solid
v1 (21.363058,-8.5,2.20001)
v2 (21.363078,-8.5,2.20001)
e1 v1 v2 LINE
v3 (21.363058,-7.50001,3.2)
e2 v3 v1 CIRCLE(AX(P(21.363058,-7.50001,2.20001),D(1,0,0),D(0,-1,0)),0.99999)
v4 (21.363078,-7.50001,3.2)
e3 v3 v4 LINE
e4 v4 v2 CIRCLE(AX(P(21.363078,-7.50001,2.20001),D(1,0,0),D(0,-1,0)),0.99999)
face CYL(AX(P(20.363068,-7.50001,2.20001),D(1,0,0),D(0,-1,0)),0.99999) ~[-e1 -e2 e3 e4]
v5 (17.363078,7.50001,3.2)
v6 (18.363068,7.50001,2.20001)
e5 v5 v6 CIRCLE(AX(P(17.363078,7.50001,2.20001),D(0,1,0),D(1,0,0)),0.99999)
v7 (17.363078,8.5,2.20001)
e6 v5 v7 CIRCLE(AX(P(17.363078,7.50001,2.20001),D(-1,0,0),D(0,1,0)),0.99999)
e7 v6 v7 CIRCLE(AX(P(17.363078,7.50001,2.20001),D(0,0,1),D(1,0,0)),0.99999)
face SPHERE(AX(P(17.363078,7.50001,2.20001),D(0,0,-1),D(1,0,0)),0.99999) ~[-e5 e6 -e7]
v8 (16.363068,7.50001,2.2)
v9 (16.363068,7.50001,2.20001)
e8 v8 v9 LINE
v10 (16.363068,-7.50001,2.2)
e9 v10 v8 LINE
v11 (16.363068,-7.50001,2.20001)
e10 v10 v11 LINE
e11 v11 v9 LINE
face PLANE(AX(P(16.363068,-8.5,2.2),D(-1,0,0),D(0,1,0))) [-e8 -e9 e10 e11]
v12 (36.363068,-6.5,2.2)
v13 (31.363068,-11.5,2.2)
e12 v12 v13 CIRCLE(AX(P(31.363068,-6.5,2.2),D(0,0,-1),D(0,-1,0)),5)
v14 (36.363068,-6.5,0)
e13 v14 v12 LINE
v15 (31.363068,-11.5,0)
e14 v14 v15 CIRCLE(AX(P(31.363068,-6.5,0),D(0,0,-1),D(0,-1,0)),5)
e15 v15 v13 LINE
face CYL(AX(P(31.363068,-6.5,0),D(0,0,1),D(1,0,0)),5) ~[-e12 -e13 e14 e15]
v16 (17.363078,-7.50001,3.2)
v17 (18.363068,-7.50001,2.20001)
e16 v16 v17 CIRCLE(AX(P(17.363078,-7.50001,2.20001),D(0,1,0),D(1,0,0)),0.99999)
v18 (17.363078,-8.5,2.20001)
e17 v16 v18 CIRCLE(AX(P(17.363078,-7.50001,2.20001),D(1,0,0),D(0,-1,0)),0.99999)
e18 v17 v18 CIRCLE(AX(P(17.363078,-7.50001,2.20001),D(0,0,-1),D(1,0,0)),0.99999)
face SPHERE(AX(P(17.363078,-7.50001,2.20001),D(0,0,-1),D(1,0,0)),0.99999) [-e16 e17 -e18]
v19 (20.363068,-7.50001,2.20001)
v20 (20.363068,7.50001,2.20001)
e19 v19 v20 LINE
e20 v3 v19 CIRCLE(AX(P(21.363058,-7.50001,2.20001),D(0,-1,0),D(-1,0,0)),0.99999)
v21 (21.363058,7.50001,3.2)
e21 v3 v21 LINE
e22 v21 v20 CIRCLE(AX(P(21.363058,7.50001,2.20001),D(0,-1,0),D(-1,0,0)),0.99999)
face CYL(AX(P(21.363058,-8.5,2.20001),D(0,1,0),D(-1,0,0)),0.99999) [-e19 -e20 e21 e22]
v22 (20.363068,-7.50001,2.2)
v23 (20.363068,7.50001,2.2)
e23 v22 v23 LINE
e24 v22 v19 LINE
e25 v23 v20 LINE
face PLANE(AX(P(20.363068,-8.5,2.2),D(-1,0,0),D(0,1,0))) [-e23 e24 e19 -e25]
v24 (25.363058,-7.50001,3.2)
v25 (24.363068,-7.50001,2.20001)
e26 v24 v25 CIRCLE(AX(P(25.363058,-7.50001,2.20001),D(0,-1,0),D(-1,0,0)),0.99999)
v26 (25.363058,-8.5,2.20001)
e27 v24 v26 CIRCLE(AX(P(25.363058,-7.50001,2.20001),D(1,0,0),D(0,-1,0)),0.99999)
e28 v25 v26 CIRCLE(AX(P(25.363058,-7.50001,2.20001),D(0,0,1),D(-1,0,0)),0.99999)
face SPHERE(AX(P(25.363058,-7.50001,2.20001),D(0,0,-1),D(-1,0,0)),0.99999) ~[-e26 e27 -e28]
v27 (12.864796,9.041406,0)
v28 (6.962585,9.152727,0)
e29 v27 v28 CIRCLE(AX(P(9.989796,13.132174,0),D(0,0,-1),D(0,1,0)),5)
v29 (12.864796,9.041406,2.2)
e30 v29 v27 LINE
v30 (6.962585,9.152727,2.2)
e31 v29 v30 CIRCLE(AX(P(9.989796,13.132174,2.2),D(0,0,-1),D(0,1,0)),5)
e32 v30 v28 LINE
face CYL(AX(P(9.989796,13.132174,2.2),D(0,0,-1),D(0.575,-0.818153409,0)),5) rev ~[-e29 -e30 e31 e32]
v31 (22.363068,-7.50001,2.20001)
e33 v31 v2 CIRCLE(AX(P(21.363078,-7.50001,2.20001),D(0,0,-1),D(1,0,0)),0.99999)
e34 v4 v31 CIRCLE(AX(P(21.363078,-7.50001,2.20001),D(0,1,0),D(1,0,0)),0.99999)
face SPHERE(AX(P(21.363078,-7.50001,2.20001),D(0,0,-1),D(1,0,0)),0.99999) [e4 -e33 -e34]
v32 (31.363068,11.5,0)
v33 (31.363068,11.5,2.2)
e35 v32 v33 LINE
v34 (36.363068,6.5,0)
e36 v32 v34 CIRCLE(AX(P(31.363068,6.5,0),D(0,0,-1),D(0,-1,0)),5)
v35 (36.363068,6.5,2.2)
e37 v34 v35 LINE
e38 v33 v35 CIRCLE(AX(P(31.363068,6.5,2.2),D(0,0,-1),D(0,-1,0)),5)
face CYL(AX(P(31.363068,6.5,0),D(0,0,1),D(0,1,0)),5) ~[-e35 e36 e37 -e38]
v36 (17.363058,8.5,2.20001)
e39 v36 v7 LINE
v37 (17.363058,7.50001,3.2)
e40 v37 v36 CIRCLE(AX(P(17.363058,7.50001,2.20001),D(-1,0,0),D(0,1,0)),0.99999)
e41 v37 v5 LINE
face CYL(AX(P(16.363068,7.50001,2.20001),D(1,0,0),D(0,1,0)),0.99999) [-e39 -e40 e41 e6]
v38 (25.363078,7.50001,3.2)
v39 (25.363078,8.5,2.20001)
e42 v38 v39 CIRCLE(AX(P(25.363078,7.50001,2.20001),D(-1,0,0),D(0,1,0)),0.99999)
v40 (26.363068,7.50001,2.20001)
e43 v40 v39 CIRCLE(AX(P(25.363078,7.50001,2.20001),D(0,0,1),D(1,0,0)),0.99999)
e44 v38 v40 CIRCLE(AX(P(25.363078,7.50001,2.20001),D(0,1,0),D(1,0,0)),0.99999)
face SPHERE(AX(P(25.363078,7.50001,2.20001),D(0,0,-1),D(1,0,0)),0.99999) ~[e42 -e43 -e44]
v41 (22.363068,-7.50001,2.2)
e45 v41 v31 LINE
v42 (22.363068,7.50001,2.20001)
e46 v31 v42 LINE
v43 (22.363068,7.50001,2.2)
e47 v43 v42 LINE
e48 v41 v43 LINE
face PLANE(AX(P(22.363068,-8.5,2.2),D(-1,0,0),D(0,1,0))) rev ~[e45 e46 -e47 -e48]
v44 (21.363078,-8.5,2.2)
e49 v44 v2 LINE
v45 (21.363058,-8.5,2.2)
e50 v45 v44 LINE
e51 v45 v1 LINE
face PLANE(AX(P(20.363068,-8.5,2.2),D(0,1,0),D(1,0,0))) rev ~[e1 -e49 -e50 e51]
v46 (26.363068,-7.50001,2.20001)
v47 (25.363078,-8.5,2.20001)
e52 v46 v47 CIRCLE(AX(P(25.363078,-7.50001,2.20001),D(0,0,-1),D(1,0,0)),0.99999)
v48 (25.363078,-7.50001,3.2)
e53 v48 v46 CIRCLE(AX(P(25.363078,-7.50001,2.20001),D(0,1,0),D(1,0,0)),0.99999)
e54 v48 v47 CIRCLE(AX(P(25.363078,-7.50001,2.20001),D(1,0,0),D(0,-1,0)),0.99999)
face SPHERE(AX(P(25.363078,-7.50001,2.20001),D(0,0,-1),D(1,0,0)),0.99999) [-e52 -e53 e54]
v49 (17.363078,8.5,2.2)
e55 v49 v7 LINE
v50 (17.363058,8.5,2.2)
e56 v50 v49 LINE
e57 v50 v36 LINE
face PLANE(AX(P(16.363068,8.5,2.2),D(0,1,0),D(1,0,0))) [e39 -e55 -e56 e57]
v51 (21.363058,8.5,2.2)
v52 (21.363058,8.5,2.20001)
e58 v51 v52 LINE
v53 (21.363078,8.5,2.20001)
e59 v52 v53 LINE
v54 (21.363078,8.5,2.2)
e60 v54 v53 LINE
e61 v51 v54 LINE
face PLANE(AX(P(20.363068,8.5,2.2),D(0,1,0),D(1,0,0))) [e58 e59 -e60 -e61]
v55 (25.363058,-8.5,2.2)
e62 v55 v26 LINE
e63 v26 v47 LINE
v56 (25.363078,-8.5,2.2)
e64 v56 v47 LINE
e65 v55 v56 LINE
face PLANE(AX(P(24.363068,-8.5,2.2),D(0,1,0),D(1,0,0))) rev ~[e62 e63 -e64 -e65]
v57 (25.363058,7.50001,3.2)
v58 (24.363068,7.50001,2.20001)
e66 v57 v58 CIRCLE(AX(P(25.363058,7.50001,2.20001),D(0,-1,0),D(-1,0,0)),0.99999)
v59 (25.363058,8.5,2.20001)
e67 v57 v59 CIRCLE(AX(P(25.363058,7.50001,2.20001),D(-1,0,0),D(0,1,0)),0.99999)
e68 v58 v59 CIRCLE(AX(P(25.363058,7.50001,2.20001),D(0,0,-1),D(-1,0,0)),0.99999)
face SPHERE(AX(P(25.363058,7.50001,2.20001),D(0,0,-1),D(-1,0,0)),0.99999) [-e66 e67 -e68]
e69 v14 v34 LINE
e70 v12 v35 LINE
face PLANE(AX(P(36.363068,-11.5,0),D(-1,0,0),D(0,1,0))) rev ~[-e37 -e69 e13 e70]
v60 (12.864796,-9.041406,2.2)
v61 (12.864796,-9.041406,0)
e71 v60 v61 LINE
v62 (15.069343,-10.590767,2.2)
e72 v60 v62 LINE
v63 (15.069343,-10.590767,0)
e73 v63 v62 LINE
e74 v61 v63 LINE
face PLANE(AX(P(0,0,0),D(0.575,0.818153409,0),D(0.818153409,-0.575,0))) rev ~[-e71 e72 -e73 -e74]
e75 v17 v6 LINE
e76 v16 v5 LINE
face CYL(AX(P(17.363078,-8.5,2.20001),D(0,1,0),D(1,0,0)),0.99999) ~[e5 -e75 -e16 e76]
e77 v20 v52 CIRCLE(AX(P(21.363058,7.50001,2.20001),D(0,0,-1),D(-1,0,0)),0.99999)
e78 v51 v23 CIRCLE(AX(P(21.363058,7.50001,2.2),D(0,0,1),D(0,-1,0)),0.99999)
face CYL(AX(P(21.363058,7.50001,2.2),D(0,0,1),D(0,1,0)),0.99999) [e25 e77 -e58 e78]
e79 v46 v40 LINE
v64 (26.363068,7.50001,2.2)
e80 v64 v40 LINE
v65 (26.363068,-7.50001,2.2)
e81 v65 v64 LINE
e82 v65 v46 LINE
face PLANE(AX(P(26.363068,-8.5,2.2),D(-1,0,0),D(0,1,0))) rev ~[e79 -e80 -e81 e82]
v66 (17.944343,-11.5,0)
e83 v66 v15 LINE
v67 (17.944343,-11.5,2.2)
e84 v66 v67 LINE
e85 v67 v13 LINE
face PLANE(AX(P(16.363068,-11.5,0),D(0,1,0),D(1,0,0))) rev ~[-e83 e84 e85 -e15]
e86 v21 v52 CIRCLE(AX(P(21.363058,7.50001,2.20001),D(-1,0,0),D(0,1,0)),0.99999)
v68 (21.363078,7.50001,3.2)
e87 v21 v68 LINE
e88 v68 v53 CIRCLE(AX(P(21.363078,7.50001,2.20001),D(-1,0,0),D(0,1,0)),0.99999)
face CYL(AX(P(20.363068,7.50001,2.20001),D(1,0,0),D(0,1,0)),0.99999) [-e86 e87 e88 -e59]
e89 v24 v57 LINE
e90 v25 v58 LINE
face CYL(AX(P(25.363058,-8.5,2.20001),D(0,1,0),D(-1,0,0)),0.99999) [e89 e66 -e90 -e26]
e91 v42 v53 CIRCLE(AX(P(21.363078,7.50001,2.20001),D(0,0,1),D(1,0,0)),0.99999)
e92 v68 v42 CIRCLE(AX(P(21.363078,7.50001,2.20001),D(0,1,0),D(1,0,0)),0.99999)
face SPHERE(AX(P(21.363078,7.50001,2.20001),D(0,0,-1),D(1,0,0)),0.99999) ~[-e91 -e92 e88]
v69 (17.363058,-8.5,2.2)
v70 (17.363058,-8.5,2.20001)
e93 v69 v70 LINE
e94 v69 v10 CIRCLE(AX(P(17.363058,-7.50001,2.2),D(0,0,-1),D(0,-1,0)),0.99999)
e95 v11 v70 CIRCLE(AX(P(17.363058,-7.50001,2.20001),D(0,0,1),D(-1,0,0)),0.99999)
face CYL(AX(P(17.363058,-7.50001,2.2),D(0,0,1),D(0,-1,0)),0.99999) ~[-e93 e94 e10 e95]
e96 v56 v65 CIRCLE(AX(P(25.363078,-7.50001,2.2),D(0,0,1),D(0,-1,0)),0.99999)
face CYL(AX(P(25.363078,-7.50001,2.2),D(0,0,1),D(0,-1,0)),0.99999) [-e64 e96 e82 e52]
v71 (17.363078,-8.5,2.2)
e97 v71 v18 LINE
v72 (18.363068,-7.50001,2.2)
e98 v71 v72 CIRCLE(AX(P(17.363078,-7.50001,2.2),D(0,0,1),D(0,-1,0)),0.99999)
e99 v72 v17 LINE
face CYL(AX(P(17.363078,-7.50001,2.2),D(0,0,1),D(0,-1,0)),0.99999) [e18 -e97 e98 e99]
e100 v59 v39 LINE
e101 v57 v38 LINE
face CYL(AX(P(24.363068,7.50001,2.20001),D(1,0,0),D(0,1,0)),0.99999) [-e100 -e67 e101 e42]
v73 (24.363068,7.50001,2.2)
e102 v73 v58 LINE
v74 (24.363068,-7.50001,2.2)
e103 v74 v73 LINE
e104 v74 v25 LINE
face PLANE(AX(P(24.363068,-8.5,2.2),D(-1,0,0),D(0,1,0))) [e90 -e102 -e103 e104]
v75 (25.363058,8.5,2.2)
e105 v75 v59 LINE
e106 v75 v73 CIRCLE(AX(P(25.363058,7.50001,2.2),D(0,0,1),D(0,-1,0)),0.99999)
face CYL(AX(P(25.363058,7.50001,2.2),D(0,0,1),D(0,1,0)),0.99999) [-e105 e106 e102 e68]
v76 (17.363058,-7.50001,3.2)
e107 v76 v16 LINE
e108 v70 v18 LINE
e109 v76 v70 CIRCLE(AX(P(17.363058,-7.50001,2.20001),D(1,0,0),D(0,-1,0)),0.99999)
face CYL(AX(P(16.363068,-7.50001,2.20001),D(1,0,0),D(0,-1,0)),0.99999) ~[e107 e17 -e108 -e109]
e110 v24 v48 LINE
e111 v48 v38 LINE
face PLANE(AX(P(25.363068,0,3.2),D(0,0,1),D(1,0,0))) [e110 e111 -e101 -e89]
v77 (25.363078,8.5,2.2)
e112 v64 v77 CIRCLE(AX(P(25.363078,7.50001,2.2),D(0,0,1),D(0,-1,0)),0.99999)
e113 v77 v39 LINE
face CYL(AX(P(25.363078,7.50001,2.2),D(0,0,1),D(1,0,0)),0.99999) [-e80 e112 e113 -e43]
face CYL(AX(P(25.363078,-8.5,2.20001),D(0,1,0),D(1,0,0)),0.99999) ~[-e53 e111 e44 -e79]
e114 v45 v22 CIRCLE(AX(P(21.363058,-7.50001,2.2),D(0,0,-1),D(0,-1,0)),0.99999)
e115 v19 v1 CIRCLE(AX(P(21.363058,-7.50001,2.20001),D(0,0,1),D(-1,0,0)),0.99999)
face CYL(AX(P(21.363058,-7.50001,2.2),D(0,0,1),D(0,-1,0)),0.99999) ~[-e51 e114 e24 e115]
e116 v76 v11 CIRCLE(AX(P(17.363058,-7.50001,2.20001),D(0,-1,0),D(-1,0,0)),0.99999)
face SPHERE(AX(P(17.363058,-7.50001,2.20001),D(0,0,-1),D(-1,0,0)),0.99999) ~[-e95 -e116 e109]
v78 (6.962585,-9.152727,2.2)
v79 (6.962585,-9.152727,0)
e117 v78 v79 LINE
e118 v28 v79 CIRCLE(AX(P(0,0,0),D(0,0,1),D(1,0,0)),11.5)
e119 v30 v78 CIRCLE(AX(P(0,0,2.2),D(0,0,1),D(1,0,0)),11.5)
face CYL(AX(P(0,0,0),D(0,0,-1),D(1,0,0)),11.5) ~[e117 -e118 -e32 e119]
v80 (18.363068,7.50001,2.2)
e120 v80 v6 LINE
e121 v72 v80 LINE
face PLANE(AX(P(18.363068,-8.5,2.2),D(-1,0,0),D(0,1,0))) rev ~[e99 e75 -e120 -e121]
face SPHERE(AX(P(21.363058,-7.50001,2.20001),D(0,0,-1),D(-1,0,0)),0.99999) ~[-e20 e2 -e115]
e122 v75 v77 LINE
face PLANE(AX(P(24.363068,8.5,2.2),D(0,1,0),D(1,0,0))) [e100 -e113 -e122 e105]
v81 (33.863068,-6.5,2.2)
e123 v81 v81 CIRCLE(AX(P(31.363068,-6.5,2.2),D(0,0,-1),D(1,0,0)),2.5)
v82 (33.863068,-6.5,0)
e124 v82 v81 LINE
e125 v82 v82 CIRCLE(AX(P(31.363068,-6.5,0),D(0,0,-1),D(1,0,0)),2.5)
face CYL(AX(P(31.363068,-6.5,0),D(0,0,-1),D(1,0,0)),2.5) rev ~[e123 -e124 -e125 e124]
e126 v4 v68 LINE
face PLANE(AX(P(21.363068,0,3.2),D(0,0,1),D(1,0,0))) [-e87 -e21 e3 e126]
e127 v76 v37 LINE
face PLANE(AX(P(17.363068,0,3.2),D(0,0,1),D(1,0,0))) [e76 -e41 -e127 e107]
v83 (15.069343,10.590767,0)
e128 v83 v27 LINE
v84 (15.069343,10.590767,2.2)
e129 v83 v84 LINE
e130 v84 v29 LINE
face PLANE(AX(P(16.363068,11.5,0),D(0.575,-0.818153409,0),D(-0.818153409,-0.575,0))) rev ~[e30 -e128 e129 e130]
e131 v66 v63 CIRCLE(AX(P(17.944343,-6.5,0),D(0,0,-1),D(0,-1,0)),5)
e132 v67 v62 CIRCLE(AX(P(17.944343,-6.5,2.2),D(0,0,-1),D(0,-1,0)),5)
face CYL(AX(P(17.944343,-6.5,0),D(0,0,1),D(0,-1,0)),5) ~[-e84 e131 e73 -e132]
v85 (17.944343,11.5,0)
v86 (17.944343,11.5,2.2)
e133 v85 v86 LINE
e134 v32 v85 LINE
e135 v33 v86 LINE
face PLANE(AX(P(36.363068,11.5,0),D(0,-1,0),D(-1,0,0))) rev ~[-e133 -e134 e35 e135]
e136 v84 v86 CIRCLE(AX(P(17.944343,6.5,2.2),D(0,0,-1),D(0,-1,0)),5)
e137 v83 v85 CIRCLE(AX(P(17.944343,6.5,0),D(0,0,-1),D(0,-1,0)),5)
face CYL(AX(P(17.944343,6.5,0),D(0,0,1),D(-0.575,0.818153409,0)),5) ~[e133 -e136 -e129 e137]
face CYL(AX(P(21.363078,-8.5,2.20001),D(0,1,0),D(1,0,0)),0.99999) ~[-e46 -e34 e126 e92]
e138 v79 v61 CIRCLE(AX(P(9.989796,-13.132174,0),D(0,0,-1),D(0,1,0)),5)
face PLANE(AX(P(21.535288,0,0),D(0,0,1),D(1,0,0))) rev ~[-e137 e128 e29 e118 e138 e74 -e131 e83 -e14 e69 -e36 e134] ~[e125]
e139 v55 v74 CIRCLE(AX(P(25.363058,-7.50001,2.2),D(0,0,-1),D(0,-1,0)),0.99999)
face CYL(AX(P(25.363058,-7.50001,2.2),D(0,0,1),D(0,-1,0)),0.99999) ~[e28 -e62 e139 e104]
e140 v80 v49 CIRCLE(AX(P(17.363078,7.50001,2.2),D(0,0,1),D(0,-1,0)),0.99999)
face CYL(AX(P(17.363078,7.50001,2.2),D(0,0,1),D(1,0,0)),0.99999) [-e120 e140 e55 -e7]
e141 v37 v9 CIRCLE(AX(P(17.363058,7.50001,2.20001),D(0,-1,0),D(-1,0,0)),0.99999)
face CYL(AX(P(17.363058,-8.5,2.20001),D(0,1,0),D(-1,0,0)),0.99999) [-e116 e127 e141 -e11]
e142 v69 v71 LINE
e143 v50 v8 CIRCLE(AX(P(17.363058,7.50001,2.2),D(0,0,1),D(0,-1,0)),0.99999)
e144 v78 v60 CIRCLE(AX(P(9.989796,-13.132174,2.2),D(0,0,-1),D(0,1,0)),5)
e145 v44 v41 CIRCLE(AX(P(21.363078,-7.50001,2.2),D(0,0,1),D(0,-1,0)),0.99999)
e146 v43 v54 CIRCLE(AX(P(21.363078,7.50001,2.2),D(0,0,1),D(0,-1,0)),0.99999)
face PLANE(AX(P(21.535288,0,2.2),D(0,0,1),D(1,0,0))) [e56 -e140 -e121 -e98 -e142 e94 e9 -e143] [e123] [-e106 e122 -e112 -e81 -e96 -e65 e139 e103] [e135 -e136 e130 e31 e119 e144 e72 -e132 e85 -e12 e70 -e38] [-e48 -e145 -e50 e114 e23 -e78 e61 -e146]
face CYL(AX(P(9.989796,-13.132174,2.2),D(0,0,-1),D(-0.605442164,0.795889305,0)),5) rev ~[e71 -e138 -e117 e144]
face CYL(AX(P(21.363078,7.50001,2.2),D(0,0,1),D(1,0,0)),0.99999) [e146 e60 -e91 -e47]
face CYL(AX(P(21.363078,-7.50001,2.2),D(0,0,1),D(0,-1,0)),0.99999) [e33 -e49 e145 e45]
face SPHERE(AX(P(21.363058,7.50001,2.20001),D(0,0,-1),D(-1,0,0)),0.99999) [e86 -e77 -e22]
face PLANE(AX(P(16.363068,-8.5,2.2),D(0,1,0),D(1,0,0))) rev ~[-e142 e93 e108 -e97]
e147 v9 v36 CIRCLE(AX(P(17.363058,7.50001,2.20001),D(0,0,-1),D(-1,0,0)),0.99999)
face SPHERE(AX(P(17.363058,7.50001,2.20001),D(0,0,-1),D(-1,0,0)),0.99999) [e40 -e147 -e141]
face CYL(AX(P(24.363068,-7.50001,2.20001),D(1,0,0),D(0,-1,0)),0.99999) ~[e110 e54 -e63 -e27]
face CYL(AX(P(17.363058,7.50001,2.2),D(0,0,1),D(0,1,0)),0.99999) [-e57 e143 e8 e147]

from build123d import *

# Parameters (mm, degrees)
F0_R     = 11.5
F1_DEPTH = 2.2
F3_DEPTH = 2.2
F4_R     = 2.5
F5_DEPTH = 2.201
F6_R     = 5
F7_W     = 2
F7_H     = 17
F8_DEPTH = 1
F9_R     = 0.99999


# Not quite as in the source:
# - a fillet or chamfer is up to 0.001 mm smaller than in the source, because OpenCascade refuses the exact size


with BuildPart() as f1:
    # F0 (on Top) → F1 (new body)
    with BuildSketch(Plane.XY):
        Circle(F0_R)
    extrude(amount=F1_DEPTH)

    # F2 (on Top) → F3 (join)
    with BuildSketch(Plane.XY):
        Polygon((16.363068172, 11.5), (0, 0), (16.363068172, -11.5), (36.363068172, -11.5), (36.363068172, 11.5), align=None)
    extrude(amount=F3_DEPTH)

    # F4 (on face) → F5 (cut, through all)
    with BuildSketch(Plane(origin=(0, 0, 0), x_dir=(1, 0, 0), z_dir=(0, 0, -1))):
        with Locations((31.363068172, 6.5)):
            Circle(F4_R)
    extrude(amount=-F5_DEPTH, mode=Mode.SUBTRACT)

    # F6
    f6_edges = [f1.edges().sort_by_distance(p)[0] for p in [
        (36.363068, -11.5, 1.1),
        (36.363068, 11.5, 1.1),
        (16.363068, -11.5, 1.1),
        (9.408764, -6.6125, 1.1),
        (9.408764, 6.6125, 1.1),
        (16.363068, 11.5, 1.1),
    ]]
    fillet(f6_edges, radius=F6_R)

    # F7 (on face) → F8 (join)
    with BuildSketch(Plane.XY.offset(2.2)):
        with Locations((17.363068172, 0)):
            Rectangle(F7_W, F7_H)
        with Locations((21.363068172, 0)):
            Rectangle(F7_W, F7_H)
        with Locations((25.363068172, 0)):
            Rectangle(F7_W, F7_H)
    extrude(amount=F8_DEPTH)

    # F9 (radius 1 in the source; OpenCascade refuses exactly that, so slightly less here)
    f9_edges = [f1.edges().sort_by_distance(p)[0] for p in [
        (16.363068, -8.5, 2.7),
        (18.363068, -8.5, 2.7),
        (20.363068, -8.5, 2.7),
        (22.363068, -8.5, 2.7),
        (24.363068, -8.5, 2.7),
        (26.363068, -8.5, 2.7),
        (26.363068, 8.5, 2.7),
        (16.363068, 8.5, 2.7),
        (24.363068, 8.5, 2.7),
        (22.363068, 8.5, 2.7),
        (18.363068, 8.5, 2.7),
        (20.363068, 8.5, 2.7),
        (20.363068, 0, 3.2),
        (22.363068, 0, 3.2),
        (21.363068, 8.5, 3.2),
        (21.363068, -8.5, 3.2),
        (18.363068, 0, 3.2),
        (16.363068, 0, 3.2),
        (17.363068, 8.5, 3.2),
        (17.363068, -8.5, 3.2),
        (26.363068, 0, 3.2),
        (24.363068, 0, 3.2),
        (25.363068, 8.5, 3.2),
        (25.363068, -8.5, 3.2),
    ]]
    fillet(f9_edges, radius=F9_R)


solid = f1.part
